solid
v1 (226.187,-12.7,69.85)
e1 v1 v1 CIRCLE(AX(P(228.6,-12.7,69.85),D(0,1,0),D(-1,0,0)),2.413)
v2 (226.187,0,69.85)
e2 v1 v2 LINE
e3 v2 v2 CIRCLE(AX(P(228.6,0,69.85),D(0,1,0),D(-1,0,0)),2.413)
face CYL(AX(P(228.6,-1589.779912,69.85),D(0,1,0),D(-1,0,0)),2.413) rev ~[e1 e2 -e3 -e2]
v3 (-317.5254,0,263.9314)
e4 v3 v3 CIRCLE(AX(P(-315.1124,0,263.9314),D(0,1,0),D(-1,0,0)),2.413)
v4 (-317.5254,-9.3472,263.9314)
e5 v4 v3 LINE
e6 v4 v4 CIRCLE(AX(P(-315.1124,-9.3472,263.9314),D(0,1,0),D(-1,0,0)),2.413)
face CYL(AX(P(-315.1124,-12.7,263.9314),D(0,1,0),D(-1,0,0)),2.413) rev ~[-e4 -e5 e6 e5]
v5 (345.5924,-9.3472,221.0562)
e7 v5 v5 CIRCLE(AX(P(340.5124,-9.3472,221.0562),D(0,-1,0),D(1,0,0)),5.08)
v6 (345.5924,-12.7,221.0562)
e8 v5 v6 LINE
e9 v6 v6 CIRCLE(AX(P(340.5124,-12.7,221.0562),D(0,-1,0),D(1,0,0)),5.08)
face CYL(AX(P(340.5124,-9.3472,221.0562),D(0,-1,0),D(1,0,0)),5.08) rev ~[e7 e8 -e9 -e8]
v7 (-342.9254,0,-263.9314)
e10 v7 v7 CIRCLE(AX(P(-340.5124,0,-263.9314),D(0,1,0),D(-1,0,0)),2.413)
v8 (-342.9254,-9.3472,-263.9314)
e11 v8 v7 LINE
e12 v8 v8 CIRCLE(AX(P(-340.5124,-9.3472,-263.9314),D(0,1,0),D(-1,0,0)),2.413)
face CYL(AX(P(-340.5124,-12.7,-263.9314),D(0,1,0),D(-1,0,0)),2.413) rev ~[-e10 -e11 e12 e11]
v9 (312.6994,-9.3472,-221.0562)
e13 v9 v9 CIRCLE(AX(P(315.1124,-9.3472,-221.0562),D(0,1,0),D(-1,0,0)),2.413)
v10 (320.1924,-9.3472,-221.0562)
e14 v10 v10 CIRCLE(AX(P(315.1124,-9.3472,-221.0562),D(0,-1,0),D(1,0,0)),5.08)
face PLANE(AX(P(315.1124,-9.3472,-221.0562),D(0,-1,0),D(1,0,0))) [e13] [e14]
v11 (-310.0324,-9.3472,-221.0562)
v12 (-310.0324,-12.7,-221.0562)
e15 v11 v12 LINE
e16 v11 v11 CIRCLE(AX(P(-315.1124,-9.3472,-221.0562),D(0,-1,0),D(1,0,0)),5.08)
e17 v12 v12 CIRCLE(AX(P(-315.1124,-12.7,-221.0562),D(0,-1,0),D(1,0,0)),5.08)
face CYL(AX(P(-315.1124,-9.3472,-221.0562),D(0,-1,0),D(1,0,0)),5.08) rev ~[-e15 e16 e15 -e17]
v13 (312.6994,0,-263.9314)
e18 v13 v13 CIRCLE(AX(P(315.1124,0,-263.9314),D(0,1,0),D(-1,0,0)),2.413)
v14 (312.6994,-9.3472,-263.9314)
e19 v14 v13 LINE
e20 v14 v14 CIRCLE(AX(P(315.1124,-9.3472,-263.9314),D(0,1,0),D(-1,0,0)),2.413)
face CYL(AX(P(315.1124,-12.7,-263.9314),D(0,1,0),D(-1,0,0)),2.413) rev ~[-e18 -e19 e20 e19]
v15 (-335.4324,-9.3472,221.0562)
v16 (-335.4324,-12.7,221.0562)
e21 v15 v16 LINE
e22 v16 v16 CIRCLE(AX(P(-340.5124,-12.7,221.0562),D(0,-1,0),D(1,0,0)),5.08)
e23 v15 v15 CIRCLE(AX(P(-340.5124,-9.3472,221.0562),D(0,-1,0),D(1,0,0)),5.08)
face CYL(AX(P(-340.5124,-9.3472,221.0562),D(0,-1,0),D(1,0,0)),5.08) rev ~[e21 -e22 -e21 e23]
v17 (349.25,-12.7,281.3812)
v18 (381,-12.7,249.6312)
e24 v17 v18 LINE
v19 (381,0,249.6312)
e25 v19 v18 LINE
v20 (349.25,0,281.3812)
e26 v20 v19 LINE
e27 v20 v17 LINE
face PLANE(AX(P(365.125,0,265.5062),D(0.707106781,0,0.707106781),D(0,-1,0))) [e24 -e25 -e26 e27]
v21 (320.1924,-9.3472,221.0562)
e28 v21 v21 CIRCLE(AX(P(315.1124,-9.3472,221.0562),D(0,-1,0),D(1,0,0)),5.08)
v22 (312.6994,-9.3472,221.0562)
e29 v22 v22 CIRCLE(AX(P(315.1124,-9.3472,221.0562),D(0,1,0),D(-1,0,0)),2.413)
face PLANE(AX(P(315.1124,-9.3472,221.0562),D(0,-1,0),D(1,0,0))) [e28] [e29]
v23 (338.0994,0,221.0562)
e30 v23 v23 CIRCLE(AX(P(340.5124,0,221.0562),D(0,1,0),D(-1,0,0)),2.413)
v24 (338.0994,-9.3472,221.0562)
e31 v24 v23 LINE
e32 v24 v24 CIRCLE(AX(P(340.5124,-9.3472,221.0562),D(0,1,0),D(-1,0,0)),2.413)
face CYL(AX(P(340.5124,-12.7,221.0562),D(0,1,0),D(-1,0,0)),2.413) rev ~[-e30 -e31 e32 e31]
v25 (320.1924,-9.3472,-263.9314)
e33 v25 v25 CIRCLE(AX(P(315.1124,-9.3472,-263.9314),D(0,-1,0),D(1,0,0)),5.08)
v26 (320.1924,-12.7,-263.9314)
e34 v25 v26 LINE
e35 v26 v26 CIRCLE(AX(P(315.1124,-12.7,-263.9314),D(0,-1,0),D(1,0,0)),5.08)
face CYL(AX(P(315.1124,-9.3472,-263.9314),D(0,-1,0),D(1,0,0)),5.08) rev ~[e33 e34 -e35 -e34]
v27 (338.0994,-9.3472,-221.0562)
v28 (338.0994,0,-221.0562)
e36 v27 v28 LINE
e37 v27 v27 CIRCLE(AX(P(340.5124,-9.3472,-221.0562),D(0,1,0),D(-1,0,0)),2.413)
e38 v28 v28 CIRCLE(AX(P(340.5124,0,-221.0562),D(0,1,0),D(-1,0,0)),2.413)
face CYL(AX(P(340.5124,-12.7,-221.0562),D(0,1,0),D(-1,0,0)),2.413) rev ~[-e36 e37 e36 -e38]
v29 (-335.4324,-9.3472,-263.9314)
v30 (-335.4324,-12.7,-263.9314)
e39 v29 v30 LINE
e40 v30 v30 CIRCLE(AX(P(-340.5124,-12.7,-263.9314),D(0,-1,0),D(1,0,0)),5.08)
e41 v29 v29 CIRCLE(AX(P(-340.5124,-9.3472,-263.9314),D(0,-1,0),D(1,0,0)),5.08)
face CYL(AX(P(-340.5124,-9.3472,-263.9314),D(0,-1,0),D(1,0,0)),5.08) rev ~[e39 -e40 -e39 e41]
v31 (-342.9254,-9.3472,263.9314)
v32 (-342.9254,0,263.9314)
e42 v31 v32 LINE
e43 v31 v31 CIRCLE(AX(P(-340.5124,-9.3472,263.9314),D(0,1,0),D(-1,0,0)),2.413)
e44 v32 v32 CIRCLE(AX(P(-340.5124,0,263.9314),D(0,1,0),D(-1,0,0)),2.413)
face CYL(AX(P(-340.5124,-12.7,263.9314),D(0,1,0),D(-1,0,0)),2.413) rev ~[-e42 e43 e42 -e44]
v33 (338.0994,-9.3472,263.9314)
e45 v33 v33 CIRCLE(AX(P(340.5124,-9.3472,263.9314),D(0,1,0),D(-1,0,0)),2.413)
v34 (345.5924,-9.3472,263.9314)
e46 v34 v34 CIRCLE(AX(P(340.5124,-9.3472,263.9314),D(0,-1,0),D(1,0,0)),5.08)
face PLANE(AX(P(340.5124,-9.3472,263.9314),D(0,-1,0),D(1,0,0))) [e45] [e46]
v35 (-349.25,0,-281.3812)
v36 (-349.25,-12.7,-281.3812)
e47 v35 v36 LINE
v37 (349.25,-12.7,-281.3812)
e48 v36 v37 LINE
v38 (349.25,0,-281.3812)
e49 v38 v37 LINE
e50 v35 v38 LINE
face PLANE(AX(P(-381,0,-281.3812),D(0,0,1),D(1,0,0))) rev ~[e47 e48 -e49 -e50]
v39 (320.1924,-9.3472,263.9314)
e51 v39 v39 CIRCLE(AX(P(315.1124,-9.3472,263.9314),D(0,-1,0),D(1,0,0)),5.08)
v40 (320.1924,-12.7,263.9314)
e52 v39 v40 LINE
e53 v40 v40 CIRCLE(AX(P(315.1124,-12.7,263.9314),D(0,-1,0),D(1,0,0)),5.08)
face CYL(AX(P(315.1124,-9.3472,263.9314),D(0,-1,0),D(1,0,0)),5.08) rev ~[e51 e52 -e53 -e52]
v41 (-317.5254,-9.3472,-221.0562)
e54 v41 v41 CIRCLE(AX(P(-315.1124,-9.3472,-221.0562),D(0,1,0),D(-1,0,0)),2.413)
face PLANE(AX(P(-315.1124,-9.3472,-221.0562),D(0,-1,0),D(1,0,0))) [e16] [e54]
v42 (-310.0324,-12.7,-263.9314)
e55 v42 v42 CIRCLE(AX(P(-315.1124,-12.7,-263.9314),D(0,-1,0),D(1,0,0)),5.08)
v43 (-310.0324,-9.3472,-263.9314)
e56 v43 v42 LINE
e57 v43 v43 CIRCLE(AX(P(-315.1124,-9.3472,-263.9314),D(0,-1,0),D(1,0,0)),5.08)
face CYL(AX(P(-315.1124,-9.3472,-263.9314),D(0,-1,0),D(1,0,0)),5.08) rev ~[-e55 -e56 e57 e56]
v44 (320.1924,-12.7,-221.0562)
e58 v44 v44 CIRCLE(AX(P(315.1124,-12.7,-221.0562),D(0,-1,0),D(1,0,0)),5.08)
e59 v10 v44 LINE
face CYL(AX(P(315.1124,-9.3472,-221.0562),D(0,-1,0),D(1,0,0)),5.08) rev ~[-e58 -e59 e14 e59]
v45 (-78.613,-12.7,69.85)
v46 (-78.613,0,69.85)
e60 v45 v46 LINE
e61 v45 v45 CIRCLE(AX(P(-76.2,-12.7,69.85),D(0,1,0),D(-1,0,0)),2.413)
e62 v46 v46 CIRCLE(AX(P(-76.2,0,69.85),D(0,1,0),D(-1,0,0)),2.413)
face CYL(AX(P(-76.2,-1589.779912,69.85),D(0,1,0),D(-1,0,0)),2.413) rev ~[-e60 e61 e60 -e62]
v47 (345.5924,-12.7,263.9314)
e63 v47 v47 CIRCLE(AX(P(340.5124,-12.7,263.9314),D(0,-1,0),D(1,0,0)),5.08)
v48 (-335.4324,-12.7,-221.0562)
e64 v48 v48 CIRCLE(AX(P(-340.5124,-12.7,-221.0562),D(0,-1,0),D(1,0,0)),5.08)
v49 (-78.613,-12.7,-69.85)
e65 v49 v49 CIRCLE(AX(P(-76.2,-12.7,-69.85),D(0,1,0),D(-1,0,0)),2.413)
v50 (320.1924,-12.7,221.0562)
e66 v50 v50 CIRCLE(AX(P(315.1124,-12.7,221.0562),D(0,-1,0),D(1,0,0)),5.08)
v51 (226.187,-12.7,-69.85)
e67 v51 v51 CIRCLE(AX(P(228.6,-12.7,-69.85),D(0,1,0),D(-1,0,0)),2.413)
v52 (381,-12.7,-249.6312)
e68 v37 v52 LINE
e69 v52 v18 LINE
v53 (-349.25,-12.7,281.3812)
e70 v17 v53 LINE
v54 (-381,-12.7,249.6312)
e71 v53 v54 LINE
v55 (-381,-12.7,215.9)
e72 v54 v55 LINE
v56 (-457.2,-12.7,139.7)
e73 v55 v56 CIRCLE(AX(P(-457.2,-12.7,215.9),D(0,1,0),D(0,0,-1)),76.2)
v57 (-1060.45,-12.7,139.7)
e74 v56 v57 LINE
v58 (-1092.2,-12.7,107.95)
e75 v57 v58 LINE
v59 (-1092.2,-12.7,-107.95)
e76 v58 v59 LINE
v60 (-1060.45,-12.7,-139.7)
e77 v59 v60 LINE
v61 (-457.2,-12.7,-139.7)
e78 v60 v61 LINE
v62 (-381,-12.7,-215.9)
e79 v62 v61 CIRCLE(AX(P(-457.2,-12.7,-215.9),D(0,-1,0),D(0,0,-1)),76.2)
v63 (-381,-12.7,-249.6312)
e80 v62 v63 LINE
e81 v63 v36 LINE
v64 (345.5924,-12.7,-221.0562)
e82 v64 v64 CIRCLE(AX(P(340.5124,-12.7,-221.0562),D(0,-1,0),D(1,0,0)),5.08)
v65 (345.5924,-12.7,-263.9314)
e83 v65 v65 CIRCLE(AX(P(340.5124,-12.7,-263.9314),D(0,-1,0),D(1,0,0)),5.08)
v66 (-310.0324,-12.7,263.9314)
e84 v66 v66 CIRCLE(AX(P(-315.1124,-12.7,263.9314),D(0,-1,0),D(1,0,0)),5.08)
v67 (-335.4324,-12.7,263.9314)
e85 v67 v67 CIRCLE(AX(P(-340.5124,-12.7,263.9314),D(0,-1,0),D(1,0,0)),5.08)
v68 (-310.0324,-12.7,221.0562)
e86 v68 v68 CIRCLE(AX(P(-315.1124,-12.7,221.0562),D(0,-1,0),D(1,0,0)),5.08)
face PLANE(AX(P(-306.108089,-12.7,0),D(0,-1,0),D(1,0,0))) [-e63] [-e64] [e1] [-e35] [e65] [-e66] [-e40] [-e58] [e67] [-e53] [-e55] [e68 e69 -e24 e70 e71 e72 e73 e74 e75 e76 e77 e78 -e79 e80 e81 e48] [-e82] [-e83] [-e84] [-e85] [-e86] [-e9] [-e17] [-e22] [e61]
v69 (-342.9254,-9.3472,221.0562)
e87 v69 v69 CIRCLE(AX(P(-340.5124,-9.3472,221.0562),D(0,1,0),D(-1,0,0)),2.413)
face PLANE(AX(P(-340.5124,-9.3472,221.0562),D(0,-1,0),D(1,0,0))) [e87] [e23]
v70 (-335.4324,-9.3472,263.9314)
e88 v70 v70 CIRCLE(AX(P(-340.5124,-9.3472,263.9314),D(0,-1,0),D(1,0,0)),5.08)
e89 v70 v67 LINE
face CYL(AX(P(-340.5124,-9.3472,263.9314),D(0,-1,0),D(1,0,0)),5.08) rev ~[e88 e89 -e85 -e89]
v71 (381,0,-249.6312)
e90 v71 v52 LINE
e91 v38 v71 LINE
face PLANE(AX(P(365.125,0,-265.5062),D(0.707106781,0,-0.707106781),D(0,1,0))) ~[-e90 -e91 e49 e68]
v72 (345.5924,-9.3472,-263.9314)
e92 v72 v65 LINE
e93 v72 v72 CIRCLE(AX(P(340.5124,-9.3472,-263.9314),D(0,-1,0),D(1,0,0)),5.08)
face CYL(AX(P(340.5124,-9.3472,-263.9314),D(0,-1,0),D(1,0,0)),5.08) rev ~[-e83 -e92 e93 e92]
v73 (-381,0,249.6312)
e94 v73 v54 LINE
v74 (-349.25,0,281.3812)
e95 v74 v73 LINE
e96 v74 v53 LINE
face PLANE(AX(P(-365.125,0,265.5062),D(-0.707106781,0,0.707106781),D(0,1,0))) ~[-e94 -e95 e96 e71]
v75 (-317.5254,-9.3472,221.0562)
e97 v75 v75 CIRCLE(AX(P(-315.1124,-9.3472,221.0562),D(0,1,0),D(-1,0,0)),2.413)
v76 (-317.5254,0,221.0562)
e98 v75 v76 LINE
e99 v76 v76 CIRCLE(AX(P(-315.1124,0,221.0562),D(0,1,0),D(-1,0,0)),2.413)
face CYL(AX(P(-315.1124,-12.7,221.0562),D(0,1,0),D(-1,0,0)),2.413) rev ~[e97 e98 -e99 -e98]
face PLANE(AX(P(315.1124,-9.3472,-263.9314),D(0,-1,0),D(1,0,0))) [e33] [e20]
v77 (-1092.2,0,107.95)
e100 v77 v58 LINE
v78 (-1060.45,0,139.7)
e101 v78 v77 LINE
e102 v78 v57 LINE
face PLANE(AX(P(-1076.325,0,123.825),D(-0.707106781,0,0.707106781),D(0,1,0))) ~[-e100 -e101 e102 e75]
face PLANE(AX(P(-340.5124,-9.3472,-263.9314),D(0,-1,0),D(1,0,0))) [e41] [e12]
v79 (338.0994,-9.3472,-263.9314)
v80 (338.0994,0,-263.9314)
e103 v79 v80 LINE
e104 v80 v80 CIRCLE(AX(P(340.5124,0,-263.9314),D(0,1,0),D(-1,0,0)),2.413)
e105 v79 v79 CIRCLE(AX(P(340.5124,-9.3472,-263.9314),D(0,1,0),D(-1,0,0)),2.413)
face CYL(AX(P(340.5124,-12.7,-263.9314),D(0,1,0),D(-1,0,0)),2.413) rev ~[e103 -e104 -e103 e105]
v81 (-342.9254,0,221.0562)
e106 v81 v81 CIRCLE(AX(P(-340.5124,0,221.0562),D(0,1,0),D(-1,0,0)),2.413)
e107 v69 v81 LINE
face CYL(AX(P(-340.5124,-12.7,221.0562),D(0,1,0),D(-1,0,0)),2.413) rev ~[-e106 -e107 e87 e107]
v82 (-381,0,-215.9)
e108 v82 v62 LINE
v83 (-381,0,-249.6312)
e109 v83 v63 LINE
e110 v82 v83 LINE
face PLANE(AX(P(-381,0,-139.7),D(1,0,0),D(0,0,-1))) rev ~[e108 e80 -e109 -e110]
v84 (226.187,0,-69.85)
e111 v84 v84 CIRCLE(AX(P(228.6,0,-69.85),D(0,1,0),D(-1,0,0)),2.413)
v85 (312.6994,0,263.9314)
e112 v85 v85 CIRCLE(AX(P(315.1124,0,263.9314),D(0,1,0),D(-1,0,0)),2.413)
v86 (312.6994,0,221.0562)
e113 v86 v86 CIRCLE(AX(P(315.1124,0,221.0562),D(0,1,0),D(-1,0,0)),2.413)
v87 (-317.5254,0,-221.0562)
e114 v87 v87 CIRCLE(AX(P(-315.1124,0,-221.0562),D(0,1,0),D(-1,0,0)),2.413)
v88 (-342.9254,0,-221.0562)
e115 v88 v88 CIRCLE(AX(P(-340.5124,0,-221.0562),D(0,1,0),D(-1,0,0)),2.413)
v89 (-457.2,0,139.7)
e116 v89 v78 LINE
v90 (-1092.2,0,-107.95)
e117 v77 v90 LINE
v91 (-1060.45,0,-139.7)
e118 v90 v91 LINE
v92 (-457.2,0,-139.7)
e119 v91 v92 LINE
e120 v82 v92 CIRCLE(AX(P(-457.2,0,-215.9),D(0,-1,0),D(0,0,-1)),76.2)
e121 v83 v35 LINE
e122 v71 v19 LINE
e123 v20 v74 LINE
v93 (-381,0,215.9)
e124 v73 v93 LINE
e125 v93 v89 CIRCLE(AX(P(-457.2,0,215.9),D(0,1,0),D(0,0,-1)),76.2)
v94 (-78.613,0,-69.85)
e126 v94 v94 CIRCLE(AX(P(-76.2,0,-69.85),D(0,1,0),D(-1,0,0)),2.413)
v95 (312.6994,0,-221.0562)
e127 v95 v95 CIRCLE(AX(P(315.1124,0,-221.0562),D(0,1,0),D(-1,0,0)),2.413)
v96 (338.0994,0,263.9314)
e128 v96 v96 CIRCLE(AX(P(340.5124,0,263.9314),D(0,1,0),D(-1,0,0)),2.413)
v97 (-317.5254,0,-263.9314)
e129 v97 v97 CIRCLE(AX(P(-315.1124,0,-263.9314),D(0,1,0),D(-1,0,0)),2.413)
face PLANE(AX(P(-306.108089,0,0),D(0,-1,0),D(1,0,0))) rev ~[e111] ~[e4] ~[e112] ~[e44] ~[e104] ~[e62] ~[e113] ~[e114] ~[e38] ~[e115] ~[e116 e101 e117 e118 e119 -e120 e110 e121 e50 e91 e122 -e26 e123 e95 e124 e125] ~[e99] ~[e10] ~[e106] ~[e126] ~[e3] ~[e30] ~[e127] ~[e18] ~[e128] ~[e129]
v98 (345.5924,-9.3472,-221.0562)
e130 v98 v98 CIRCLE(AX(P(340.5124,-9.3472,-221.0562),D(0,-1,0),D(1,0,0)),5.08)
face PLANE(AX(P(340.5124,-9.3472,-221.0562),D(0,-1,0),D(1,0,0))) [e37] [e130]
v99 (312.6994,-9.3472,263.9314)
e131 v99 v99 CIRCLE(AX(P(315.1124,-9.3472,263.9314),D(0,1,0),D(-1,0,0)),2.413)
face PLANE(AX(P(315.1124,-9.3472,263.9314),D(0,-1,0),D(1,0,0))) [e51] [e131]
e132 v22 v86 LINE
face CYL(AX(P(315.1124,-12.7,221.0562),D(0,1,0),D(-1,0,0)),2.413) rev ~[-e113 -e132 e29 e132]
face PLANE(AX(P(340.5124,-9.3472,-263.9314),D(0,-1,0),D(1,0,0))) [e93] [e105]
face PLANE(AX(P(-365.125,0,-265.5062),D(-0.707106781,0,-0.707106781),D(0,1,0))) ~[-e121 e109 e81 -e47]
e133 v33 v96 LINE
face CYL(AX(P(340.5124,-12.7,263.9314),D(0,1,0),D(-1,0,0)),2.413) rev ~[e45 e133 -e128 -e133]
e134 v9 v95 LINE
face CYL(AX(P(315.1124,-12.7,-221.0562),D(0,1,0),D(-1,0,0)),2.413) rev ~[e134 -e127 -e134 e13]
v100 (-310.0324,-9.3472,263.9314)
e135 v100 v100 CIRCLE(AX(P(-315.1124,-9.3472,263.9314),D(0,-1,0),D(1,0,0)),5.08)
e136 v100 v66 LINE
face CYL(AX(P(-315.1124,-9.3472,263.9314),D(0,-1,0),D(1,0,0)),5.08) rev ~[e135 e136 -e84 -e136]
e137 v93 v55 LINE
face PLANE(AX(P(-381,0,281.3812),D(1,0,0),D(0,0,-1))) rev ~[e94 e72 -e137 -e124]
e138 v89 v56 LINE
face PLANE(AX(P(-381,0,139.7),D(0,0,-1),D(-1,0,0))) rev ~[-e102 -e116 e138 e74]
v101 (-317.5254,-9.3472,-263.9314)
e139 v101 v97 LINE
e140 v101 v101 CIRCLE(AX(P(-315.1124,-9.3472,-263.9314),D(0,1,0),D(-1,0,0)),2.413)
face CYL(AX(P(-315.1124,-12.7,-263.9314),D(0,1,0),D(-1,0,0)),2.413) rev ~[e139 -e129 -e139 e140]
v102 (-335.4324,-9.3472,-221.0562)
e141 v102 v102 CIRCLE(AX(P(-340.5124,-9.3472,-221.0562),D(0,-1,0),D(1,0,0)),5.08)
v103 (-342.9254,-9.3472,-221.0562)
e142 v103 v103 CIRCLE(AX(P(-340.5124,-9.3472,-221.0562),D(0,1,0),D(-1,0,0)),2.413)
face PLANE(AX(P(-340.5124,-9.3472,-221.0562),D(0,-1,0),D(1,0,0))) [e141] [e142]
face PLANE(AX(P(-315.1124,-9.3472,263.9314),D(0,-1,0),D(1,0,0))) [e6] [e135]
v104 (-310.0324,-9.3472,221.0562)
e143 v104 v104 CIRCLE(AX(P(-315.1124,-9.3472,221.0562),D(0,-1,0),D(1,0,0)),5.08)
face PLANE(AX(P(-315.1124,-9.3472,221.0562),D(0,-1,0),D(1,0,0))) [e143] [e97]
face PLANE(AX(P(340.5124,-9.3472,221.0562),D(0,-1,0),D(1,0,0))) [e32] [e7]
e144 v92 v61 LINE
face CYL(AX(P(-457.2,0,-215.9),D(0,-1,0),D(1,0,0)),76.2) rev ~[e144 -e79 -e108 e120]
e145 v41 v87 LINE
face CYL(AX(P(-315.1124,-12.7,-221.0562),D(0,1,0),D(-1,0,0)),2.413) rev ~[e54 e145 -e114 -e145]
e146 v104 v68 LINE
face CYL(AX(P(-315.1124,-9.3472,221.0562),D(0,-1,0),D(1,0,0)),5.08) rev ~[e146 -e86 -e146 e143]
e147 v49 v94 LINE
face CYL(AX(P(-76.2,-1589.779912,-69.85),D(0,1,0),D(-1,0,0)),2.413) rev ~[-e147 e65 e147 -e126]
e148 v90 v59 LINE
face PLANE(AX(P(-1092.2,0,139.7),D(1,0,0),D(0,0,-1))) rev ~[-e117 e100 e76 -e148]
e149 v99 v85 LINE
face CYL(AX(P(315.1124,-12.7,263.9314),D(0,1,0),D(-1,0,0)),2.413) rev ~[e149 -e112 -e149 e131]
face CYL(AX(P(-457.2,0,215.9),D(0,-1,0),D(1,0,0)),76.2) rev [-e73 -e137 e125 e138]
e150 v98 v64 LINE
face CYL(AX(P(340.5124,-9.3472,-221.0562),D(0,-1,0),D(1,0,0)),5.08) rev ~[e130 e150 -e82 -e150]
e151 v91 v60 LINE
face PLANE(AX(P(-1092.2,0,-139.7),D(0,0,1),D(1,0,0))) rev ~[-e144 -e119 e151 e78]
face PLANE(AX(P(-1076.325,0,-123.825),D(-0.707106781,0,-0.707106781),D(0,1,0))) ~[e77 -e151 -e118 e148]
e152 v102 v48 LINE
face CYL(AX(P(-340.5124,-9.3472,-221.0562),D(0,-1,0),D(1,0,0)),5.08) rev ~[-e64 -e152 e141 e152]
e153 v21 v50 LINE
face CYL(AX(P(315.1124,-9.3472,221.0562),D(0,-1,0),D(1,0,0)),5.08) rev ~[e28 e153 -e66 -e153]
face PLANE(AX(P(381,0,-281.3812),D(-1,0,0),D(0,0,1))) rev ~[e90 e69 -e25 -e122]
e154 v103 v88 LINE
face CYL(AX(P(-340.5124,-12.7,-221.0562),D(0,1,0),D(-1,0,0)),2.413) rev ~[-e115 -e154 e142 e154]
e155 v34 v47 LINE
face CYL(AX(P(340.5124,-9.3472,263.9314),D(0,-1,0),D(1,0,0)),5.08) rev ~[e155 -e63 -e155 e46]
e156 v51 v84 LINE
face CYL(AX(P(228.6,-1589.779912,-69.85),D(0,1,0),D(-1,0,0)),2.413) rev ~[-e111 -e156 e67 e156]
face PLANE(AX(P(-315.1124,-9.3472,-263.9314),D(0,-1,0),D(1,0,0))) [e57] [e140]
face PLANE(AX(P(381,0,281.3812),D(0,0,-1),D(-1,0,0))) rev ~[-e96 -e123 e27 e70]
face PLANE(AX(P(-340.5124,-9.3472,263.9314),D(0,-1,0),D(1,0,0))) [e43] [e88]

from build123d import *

# Parameters (mm, degrees)
F1_DEPTH       = 12.7
F2_SIZE        = 31.75
F3_R           = 76.2
F5_D           = 4.826
F5_CBORE_D     = 10.16
F5_CBORE_DEPTH = 3.3528
F7_D           = 4.826


# Not quite as in the source:
# - a feature names something its author has since deleted; it is built from what else it names


with BuildPart() as f1:
    # F0 (on Front) → F1 (new body)
    with BuildSketch(Plane.XZ):
        Polygon((381, 139.7), (381, 281.3812), (-381, 281.3812), (-381, 139.7), (-1092.2, 139.7), (-1092.2, 0), (-1092.2, -139.7), (-400.1457989216, -139.7), (-381, -139.7), (-381, -281.3812), (381, -281.3812), (381, -139.7), (381, -69.85), (381, 0), (381, 69.85), align=None)
    extrude(amount=F1_DEPTH)

    # F2
    f2_edges = [f1.edges().sort_by_distance(p)[0] for p in [
        (-381, -6.35, -281.3812),
        (381, -6.35, -281.3812),
        (381, -6.35, 281.3812),
        (-381, -6.35, 281.3812),
        (-1092.2, -6.35, -139.7),
        (-1092.2, -6.35, 139.7),
    ]]
    chamfer(f2_edges, length=F2_SIZE)

    # F3
    f3_edges = [f1.edges().sort_by_distance(p)[0] for p in [
        (-381, -6.35, 139.7),
        (-381, -6.35, -139.7),
    ]]
    fillet(f3_edges, radius=F3_R)

    # F5 (through all)
    with Locations(Plane.XZ.offset(12.7)):
        with Locations((-340.5124, 263.9314), (-315.1124, 263.9314), (-315.1124, 221.0562), (-340.5124, 221.0562), (315.1124, 263.9314), (340.5124, 263.9314), (340.5124, 221.0562), (315.1124, 221.0562), (340.5124, -221.0562), (315.1124, -221.0562), (315.1124, -263.9314), (340.5124, -263.9314), (-315.1124, -221.0562), (-340.5124, -221.0562), (-340.5124, -263.9314), (-315.1124, -263.9314)):
            CounterBoreHole(F5_D / 2, F5_CBORE_D / 2, F5_CBORE_DEPTH)

    # F7 (through all)
    with Locations(Plane.XZ.offset(12.7)):
        with Locations((-76.2, 69.85), (228.6, 69.85), (228.6, -69.85), (-76.2, -69.85)):
            Hole(F7_D / 2)


solid = f1.part
